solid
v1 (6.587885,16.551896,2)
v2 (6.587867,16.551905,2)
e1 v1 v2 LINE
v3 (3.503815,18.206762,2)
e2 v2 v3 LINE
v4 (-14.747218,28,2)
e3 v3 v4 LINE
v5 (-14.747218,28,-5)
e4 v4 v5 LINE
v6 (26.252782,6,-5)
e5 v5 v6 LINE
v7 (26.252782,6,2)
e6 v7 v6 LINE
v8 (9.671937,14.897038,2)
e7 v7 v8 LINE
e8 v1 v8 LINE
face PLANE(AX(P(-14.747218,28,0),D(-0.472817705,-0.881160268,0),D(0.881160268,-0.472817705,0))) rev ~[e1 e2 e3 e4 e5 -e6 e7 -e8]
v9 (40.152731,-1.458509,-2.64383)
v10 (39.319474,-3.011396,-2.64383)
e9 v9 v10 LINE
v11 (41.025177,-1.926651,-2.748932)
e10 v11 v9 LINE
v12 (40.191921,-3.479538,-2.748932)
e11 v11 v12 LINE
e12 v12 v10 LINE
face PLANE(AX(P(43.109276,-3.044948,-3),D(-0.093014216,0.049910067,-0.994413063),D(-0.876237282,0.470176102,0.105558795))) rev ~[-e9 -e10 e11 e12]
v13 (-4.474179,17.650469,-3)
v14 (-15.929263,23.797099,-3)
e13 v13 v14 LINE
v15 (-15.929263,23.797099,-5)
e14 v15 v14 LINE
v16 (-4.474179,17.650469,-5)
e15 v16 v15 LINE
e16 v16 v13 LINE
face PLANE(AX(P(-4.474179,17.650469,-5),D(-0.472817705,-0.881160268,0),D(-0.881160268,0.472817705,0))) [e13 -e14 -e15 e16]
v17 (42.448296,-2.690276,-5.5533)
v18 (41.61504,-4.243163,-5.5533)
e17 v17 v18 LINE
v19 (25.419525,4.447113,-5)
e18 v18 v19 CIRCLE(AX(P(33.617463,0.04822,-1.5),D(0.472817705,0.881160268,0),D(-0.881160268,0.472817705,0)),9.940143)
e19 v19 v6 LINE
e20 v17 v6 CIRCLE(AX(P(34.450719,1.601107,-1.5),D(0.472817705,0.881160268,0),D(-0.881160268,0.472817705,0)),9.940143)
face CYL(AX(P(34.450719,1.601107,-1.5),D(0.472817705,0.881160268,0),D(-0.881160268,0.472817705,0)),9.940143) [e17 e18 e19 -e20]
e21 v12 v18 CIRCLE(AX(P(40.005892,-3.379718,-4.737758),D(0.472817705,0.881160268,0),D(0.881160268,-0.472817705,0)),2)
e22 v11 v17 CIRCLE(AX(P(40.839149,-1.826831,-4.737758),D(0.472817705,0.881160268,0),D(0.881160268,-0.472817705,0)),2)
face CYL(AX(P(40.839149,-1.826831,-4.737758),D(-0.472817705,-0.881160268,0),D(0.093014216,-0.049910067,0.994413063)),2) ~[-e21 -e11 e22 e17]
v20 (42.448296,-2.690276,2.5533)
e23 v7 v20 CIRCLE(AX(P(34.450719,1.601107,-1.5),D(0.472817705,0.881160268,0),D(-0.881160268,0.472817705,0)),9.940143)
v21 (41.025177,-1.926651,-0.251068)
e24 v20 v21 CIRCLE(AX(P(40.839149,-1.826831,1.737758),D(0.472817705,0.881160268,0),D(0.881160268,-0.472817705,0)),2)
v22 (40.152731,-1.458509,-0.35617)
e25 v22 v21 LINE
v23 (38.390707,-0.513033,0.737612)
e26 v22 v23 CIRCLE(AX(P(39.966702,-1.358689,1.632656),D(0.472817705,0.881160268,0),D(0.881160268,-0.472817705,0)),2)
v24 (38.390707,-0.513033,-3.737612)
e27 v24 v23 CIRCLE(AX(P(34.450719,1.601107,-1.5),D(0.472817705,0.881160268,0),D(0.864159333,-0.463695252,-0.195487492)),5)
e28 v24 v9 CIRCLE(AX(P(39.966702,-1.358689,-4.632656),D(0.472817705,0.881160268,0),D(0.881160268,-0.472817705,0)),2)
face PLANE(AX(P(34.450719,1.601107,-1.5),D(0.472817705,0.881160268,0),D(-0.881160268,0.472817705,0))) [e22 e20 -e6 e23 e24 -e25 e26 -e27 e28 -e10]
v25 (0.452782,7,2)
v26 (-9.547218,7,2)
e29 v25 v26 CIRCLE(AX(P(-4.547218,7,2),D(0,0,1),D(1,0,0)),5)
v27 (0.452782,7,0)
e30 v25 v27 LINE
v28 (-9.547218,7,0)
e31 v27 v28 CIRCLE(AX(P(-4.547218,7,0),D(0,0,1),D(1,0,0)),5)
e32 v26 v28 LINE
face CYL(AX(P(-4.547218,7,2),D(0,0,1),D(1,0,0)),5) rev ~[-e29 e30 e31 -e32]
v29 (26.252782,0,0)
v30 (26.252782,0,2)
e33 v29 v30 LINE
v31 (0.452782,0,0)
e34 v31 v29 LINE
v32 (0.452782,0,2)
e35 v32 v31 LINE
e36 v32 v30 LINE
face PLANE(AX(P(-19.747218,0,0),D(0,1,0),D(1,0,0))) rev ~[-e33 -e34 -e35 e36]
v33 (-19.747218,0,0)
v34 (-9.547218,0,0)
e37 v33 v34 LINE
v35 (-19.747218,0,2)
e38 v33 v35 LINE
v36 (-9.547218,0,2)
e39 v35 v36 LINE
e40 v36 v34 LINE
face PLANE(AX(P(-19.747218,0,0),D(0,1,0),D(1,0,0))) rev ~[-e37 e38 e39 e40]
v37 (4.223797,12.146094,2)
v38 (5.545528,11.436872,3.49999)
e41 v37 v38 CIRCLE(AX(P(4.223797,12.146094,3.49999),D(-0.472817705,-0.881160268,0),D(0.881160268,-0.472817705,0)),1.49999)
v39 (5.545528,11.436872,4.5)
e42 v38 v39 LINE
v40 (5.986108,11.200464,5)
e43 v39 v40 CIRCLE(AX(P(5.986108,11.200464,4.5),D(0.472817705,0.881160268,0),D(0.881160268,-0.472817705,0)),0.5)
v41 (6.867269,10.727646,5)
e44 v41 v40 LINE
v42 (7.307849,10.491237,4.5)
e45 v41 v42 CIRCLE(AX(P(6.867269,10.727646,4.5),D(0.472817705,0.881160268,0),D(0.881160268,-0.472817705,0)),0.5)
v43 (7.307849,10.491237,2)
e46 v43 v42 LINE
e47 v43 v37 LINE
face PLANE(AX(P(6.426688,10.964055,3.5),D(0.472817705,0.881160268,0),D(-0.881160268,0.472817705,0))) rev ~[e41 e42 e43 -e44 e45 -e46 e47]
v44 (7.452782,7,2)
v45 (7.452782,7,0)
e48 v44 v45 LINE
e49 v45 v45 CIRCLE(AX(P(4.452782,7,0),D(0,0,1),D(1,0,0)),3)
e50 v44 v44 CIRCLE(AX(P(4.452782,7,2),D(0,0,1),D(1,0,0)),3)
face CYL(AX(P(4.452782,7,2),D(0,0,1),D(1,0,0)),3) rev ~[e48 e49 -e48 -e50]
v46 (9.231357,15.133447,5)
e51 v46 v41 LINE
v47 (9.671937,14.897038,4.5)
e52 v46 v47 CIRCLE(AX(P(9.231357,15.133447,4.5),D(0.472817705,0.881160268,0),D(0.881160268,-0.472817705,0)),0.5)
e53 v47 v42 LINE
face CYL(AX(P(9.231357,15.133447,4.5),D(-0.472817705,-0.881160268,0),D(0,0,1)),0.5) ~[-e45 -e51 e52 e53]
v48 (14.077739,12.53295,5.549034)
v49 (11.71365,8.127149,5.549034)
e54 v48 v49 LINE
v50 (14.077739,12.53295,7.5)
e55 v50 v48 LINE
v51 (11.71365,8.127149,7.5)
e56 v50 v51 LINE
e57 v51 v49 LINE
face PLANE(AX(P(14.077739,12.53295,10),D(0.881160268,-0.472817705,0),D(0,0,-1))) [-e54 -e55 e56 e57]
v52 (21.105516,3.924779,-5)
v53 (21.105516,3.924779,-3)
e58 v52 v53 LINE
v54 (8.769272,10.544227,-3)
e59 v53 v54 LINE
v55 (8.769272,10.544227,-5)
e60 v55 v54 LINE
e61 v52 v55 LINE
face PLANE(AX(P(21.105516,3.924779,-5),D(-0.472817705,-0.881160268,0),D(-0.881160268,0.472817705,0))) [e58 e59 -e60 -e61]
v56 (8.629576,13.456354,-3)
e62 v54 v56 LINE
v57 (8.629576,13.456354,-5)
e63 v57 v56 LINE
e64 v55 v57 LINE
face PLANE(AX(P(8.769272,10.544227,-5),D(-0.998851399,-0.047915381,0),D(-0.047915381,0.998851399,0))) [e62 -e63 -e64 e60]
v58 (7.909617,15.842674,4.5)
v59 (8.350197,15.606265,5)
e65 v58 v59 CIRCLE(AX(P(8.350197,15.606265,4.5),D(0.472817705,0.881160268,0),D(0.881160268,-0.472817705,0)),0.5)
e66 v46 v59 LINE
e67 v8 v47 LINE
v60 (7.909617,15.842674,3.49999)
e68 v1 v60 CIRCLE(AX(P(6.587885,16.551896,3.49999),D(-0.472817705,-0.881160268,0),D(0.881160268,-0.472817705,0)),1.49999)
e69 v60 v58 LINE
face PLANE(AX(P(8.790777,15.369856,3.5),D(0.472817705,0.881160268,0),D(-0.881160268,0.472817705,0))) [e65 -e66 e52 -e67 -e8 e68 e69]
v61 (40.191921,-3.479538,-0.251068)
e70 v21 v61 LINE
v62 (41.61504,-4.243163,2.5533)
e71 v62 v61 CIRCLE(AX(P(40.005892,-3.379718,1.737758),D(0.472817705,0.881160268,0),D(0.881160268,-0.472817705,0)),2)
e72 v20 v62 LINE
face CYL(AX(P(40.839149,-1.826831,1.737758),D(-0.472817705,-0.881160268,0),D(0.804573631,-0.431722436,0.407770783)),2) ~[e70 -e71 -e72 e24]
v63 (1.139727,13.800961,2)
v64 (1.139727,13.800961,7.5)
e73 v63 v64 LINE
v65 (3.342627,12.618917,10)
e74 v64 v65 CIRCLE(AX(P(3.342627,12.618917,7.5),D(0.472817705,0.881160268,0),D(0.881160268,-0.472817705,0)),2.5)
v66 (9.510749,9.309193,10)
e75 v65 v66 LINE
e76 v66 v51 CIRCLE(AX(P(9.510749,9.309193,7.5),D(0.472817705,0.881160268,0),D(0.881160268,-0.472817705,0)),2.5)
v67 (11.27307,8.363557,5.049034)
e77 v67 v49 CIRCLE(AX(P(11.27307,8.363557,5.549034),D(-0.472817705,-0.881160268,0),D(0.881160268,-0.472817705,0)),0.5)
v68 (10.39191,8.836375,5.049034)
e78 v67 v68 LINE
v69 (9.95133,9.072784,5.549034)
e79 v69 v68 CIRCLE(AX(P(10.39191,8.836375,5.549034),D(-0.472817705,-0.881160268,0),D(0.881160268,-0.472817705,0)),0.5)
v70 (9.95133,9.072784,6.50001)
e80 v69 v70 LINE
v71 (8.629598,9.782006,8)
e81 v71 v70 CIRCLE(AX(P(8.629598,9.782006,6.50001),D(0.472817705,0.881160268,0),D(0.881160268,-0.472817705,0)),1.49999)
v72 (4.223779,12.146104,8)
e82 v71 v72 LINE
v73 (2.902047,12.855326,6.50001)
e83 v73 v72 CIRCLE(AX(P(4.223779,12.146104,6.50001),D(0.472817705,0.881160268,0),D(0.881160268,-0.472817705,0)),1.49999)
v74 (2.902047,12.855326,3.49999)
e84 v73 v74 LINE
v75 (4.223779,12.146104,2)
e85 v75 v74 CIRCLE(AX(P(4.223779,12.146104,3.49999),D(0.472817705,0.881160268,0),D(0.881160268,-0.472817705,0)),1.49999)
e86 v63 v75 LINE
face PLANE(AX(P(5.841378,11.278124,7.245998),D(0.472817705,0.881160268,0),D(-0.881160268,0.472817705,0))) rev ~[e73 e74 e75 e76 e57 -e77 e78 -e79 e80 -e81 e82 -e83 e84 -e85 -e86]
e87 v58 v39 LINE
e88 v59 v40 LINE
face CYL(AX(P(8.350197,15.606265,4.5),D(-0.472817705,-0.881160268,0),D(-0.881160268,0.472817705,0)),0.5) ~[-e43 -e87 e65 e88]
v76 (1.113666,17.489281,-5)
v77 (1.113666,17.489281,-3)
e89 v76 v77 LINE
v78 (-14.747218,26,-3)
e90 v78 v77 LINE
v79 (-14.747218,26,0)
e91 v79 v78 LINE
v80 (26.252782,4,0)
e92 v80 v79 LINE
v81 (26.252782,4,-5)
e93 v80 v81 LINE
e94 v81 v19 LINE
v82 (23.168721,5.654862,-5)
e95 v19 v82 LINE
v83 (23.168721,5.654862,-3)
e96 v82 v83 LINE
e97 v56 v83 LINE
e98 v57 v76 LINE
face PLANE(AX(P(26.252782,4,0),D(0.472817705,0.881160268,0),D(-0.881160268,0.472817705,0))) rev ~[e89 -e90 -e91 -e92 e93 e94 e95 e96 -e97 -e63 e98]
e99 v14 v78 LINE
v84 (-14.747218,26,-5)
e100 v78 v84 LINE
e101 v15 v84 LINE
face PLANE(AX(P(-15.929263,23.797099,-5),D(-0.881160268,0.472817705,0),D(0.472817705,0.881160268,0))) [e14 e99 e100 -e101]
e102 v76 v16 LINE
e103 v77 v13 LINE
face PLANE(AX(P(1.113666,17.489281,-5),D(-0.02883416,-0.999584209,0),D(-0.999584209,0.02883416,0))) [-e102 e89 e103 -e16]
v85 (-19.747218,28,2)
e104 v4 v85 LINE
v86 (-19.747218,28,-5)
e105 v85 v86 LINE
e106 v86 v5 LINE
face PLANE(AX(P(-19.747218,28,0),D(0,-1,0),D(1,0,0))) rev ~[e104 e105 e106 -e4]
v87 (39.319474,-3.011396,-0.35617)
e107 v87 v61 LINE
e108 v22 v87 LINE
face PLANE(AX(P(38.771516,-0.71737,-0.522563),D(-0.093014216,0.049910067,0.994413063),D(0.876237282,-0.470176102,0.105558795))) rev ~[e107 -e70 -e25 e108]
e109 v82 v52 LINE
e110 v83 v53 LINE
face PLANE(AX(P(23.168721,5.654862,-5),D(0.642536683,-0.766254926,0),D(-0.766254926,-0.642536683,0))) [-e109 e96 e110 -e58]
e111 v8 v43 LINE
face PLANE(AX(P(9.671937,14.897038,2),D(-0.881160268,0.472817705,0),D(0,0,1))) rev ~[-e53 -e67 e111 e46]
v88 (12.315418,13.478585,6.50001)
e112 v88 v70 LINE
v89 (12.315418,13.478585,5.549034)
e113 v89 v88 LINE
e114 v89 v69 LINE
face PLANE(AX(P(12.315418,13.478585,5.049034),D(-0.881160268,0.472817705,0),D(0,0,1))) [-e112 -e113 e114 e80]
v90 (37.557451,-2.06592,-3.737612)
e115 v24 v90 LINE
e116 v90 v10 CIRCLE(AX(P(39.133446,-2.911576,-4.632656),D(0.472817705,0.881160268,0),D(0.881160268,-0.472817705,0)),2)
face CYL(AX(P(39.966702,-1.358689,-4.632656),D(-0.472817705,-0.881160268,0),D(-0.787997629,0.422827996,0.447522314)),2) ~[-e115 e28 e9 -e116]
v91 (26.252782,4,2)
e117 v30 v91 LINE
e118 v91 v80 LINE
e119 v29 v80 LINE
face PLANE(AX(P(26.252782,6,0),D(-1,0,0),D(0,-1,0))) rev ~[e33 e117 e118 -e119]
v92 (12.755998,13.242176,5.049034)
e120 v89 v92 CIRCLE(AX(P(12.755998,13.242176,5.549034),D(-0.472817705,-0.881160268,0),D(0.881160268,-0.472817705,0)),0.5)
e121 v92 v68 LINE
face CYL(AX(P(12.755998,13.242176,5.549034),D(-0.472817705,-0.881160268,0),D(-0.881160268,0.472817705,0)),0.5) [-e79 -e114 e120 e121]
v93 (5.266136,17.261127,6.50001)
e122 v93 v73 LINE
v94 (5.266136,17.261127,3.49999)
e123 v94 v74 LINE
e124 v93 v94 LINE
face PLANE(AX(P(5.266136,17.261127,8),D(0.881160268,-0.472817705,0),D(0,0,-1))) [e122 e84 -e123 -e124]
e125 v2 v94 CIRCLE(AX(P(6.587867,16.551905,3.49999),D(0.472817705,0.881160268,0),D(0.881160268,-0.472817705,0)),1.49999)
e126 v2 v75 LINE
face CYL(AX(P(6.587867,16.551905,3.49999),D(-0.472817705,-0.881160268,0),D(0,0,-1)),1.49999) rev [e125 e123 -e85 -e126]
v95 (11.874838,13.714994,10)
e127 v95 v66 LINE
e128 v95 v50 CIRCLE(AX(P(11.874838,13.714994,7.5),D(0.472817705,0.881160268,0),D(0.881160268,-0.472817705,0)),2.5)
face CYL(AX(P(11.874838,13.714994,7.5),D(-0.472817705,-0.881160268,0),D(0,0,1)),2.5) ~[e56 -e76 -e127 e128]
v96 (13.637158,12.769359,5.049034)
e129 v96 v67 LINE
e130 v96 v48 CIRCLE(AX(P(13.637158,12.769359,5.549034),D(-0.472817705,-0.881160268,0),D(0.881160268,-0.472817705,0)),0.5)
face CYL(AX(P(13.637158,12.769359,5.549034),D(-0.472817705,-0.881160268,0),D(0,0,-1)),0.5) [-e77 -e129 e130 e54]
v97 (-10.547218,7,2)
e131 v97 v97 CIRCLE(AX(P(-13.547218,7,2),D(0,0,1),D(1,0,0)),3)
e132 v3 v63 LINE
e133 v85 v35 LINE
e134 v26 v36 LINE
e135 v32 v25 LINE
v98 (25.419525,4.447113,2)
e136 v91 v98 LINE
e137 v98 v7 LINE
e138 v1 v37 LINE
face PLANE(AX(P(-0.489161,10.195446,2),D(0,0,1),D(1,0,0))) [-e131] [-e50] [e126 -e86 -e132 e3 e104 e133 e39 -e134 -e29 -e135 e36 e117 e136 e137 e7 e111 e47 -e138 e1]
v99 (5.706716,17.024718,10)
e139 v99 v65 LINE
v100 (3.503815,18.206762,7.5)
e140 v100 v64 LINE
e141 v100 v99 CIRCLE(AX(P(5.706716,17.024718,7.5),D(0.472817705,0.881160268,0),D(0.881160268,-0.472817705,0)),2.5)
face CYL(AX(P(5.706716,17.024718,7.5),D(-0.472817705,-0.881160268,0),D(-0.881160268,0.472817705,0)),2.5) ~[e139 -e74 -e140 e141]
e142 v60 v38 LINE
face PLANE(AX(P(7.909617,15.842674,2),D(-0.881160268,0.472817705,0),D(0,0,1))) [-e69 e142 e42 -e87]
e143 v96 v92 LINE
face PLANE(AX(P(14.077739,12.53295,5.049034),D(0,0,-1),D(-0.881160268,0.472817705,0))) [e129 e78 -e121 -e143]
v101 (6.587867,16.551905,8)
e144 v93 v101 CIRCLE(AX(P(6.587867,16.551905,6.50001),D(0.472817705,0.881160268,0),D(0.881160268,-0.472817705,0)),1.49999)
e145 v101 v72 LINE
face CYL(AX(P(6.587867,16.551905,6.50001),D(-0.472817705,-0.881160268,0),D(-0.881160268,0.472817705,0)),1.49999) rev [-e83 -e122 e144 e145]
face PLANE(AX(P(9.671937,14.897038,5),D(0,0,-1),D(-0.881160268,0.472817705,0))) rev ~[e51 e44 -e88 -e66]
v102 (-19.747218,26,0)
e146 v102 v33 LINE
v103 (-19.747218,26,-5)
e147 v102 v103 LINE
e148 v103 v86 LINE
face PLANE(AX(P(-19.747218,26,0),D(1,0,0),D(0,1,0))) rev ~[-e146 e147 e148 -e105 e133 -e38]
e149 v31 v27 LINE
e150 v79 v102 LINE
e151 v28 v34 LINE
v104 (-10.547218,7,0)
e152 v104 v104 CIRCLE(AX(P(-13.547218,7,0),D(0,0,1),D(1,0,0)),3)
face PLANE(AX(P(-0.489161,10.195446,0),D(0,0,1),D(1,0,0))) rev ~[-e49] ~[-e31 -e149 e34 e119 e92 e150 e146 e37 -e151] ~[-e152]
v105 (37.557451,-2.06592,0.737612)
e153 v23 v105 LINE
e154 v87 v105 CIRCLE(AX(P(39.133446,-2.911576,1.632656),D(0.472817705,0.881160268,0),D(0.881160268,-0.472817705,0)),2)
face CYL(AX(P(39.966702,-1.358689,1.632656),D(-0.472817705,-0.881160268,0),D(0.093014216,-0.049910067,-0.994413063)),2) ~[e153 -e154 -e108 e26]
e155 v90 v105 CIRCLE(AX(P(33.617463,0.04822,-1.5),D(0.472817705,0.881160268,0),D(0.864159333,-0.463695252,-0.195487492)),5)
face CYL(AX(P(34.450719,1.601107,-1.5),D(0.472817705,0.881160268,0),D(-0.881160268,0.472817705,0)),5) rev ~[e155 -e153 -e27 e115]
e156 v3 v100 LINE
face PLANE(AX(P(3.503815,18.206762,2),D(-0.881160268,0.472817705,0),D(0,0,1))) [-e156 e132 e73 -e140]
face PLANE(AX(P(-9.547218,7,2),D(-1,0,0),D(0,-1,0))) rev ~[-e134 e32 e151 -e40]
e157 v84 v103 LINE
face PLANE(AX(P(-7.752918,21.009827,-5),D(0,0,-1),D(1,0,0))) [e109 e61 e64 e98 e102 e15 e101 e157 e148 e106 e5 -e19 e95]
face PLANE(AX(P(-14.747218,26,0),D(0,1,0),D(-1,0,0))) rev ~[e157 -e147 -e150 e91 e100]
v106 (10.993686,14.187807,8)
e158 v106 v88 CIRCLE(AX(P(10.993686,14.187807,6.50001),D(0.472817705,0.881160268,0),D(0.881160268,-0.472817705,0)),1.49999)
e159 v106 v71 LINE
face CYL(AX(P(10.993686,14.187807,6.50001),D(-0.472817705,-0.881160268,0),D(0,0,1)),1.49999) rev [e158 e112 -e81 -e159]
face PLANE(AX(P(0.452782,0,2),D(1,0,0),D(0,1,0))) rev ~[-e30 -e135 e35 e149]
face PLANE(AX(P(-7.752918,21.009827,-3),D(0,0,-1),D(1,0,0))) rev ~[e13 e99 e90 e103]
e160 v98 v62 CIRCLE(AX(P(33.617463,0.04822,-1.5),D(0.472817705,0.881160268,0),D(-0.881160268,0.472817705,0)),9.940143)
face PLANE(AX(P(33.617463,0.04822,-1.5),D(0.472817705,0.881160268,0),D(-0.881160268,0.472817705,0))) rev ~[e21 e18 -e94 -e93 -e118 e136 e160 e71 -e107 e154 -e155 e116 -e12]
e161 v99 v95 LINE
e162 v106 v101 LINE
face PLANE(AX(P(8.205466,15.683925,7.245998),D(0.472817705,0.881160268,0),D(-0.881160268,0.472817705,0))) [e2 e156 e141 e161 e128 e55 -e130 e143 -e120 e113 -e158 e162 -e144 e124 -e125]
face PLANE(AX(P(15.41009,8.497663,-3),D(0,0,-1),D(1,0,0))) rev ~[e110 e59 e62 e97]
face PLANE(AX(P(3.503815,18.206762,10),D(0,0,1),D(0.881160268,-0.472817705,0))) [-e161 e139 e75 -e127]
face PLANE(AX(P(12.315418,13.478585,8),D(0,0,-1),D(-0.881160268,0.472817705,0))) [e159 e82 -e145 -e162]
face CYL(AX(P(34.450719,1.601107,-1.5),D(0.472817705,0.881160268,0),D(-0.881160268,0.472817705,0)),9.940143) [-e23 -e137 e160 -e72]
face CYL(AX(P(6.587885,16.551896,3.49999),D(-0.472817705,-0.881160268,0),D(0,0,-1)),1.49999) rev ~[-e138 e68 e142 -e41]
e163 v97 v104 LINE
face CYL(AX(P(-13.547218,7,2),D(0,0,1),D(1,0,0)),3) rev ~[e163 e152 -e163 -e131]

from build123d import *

# Parameters (mm, degrees)
F1_DEPTH  = 2
F2_R      = 3
F3_DEPTH  = 2
F4_W      = 2
F4_H      = 3
F5_DEPTH  = 5
F6_R      = 2.5
F7_R      = 1.49999
F8_R      = 0.5
F10_DEPTH = 5
F12_DEPTH = 2
F13_R     = 9.9401429079
F13_R_2   = 5
F14_DEPTH = 1.7623205361
F16_DEPTH = 1.7623205361
F17_R     = 2


# Not quite as in the source:
# - a fillet or chamfer is up to 0.001 mm smaller than in the source, because OpenCascade refuses the exact size


with BuildPart() as f1:
    # F0 (on Top) → F1 (new body)
    with BuildSketch(Plane.XY):
        Polygon((-19.7472184807, 28), (-19.7472184807, 0), (26.2527815193, 0), (26.2527815193, 6), (-14.7472184807, 28), align=None)
    extrude(amount=F1_DEPTH)

    # F2 (on face) → F3 (cut, through all)
    with BuildSketch(Plane.XY.offset(2)):
        with Locations((-13.5472184807, 7)):
            Circle(F2_R)
        with Locations((4.4527815193, 7)):
            Circle(F2_R)
        with BuildLine():
            Line((-9.5472184807, 7), (-9.5472184807, 0))
            Line((-9.5472184807, 0), (0.4527815193, 0))
            Line((0.4527815193, 0), (0.4527815193, 7))
            ThreePointArc((0.4527815193, 7), (-4.5472184807, 12), (-9.5472184807, 7))
        make_face()
    extrude(amount=-F3_DEPTH, mode=Mode.SUBTRACT)

    # F4 (on face) → F5 (join)
    with BuildSketch(Plane(origin=(8.3687511572, 15.5963089748, 0), x_dir=(-0.8811602681, 0.4728177048, 0), z_dir=(0.4728177048, 0.8811602681, 0))):
        Polygon((3.5210567079, 2), (5.5210567079, 2), (5.5210567079, 10), (-6.4789432921, 10), (-6.4789432921, 5.0490344875), (-4.4789432921, 5.0490344875), (-4.4789432921, 8), (3.5210567079, 8), align=None)
        with Locations((-0.4789432921, 3.5)):
            Rectangle(F4_W, F4_H)
    extrude(amount=-F5_DEPTH)

    # F6
    f6_edges = [f1.edges().sort_by_distance(p)[0] for p in [
        (12.895694, 10.330049, 10),
        (2.321771, 16.003862, 10),
    ]]
    fillet(f6_edges, radius=F6_R)

    # F7 (radius 1.5 in the source; OpenCascade refuses exactly that, so slightly less here)
    f7_edges = [f1.edges().sort_by_distance(p)[0] for p in [
        (6.727572, 13.639773, 2),
        (4.084092, 15.058226, 2),
        (11.133374, 11.275685, 8),
        (4.084092, 15.058226, 8),
    ]]
    fillet(f7_edges, radius=F7_R)

    # F8
    f8_edges = [f1.edges().sort_by_distance(p)[0] for p in [
        (12.895694, 10.330049, 5.049034),
        (11.133374, 11.275685, 5.049034),
        (8.489893, 12.694138, 5),
        (6.727572, 13.639773, 5),
    ]]
    fillet(f8_edges, radius=F8_R)

    # F9 (on face) → F10 (join)
    with BuildSketch(Plane(origin=(0, 0, 0), x_dir=(1, 0, 0), z_dir=(0, 0, -1))):
        Polygon((-19.7472184807, -26), (-19.7472184807, -28), (-14.7472184807, -28), (26.2527815193, -6), (26.2527815193, -4), (-14.7472184807, -26), align=None)
    extrude(amount=F10_DEPTH)

    # F11 (on face) → F12 (join)
    with BuildSketch(Plane(origin=(0, 0, -5), x_dir=(1, 0, 0), z_dir=(0, 0, -1))):
        Polygon((-15.9292627427, -23.7970993298), (-14.7472184807, -26), (1.1136663445, -17.4892813133), (-4.4741792579, -17.6504691673), align=None)
        Polygon((8.6295761581, -13.4563540963), (23.1687205811, -5.6548619669), (21.105516051, -3.9247790015), (8.7692722981, -10.5442268689), align=None)
    extrude(amount=-F12_DEPTH)

    # F13 (on face) → F14 (join, through all)
    with BuildSketch(Plane(origin=(8.3687511572, 15.5963089748, 0), x_dir=(-0.8811602681, 0.4728177048, 0), z_dir=(0.4728177048, 0.8811602681, 0))):
        with Locations((-29.5995731847, -1.5)):
            Circle(F13_R)
        with Locations((-29.5995731847, -1.5)):
            Circle(F13_R_2, mode=Mode.SUBTRACT)
    extrude(amount=-F14_DEPTH)

    # F15 (on face) → F16 (cut, through all)
    with BuildSketch(Plane(origin=(8.3687511572, 15.5963089748, 0), x_dir=(-0.8811602681, 0.4728177048, 0), z_dir=(0.4728177048, 0.8811602681, 0))):
        with BuildLine():
            ThreePointArc((-34.5031041583, -2.4774374616), (-34.5995731847, -1.5), (-34.5031041583, -0.5225625384))
            Line((-34.5031041583, -0.5225625384), (-39.4258868897, 0))
            ThreePointArc((-39.4258868897, 0), (-39.5397160926, -1.5), (-39.4258868897, -3))
            Line((-39.4258868897, -3), (-34.5031041583, -2.4774374616))
        make_face()
    extrude(amount=-F16_DEPTH, mode=Mode.SUBTRACT)

    # F17
    f17_edges = [f1.edges().sort_by_distance(p)[0] for p in [
        (42.692648, -3.821392, -3),
        (42.692648, -3.821392, 0),
        (38.354887, -1.493813, -0.522563),
        (38.354887, -1.493813, -2.477437),
    ]]
    fillet(f17_edges, radius=F17_R)


solid = f1.part
